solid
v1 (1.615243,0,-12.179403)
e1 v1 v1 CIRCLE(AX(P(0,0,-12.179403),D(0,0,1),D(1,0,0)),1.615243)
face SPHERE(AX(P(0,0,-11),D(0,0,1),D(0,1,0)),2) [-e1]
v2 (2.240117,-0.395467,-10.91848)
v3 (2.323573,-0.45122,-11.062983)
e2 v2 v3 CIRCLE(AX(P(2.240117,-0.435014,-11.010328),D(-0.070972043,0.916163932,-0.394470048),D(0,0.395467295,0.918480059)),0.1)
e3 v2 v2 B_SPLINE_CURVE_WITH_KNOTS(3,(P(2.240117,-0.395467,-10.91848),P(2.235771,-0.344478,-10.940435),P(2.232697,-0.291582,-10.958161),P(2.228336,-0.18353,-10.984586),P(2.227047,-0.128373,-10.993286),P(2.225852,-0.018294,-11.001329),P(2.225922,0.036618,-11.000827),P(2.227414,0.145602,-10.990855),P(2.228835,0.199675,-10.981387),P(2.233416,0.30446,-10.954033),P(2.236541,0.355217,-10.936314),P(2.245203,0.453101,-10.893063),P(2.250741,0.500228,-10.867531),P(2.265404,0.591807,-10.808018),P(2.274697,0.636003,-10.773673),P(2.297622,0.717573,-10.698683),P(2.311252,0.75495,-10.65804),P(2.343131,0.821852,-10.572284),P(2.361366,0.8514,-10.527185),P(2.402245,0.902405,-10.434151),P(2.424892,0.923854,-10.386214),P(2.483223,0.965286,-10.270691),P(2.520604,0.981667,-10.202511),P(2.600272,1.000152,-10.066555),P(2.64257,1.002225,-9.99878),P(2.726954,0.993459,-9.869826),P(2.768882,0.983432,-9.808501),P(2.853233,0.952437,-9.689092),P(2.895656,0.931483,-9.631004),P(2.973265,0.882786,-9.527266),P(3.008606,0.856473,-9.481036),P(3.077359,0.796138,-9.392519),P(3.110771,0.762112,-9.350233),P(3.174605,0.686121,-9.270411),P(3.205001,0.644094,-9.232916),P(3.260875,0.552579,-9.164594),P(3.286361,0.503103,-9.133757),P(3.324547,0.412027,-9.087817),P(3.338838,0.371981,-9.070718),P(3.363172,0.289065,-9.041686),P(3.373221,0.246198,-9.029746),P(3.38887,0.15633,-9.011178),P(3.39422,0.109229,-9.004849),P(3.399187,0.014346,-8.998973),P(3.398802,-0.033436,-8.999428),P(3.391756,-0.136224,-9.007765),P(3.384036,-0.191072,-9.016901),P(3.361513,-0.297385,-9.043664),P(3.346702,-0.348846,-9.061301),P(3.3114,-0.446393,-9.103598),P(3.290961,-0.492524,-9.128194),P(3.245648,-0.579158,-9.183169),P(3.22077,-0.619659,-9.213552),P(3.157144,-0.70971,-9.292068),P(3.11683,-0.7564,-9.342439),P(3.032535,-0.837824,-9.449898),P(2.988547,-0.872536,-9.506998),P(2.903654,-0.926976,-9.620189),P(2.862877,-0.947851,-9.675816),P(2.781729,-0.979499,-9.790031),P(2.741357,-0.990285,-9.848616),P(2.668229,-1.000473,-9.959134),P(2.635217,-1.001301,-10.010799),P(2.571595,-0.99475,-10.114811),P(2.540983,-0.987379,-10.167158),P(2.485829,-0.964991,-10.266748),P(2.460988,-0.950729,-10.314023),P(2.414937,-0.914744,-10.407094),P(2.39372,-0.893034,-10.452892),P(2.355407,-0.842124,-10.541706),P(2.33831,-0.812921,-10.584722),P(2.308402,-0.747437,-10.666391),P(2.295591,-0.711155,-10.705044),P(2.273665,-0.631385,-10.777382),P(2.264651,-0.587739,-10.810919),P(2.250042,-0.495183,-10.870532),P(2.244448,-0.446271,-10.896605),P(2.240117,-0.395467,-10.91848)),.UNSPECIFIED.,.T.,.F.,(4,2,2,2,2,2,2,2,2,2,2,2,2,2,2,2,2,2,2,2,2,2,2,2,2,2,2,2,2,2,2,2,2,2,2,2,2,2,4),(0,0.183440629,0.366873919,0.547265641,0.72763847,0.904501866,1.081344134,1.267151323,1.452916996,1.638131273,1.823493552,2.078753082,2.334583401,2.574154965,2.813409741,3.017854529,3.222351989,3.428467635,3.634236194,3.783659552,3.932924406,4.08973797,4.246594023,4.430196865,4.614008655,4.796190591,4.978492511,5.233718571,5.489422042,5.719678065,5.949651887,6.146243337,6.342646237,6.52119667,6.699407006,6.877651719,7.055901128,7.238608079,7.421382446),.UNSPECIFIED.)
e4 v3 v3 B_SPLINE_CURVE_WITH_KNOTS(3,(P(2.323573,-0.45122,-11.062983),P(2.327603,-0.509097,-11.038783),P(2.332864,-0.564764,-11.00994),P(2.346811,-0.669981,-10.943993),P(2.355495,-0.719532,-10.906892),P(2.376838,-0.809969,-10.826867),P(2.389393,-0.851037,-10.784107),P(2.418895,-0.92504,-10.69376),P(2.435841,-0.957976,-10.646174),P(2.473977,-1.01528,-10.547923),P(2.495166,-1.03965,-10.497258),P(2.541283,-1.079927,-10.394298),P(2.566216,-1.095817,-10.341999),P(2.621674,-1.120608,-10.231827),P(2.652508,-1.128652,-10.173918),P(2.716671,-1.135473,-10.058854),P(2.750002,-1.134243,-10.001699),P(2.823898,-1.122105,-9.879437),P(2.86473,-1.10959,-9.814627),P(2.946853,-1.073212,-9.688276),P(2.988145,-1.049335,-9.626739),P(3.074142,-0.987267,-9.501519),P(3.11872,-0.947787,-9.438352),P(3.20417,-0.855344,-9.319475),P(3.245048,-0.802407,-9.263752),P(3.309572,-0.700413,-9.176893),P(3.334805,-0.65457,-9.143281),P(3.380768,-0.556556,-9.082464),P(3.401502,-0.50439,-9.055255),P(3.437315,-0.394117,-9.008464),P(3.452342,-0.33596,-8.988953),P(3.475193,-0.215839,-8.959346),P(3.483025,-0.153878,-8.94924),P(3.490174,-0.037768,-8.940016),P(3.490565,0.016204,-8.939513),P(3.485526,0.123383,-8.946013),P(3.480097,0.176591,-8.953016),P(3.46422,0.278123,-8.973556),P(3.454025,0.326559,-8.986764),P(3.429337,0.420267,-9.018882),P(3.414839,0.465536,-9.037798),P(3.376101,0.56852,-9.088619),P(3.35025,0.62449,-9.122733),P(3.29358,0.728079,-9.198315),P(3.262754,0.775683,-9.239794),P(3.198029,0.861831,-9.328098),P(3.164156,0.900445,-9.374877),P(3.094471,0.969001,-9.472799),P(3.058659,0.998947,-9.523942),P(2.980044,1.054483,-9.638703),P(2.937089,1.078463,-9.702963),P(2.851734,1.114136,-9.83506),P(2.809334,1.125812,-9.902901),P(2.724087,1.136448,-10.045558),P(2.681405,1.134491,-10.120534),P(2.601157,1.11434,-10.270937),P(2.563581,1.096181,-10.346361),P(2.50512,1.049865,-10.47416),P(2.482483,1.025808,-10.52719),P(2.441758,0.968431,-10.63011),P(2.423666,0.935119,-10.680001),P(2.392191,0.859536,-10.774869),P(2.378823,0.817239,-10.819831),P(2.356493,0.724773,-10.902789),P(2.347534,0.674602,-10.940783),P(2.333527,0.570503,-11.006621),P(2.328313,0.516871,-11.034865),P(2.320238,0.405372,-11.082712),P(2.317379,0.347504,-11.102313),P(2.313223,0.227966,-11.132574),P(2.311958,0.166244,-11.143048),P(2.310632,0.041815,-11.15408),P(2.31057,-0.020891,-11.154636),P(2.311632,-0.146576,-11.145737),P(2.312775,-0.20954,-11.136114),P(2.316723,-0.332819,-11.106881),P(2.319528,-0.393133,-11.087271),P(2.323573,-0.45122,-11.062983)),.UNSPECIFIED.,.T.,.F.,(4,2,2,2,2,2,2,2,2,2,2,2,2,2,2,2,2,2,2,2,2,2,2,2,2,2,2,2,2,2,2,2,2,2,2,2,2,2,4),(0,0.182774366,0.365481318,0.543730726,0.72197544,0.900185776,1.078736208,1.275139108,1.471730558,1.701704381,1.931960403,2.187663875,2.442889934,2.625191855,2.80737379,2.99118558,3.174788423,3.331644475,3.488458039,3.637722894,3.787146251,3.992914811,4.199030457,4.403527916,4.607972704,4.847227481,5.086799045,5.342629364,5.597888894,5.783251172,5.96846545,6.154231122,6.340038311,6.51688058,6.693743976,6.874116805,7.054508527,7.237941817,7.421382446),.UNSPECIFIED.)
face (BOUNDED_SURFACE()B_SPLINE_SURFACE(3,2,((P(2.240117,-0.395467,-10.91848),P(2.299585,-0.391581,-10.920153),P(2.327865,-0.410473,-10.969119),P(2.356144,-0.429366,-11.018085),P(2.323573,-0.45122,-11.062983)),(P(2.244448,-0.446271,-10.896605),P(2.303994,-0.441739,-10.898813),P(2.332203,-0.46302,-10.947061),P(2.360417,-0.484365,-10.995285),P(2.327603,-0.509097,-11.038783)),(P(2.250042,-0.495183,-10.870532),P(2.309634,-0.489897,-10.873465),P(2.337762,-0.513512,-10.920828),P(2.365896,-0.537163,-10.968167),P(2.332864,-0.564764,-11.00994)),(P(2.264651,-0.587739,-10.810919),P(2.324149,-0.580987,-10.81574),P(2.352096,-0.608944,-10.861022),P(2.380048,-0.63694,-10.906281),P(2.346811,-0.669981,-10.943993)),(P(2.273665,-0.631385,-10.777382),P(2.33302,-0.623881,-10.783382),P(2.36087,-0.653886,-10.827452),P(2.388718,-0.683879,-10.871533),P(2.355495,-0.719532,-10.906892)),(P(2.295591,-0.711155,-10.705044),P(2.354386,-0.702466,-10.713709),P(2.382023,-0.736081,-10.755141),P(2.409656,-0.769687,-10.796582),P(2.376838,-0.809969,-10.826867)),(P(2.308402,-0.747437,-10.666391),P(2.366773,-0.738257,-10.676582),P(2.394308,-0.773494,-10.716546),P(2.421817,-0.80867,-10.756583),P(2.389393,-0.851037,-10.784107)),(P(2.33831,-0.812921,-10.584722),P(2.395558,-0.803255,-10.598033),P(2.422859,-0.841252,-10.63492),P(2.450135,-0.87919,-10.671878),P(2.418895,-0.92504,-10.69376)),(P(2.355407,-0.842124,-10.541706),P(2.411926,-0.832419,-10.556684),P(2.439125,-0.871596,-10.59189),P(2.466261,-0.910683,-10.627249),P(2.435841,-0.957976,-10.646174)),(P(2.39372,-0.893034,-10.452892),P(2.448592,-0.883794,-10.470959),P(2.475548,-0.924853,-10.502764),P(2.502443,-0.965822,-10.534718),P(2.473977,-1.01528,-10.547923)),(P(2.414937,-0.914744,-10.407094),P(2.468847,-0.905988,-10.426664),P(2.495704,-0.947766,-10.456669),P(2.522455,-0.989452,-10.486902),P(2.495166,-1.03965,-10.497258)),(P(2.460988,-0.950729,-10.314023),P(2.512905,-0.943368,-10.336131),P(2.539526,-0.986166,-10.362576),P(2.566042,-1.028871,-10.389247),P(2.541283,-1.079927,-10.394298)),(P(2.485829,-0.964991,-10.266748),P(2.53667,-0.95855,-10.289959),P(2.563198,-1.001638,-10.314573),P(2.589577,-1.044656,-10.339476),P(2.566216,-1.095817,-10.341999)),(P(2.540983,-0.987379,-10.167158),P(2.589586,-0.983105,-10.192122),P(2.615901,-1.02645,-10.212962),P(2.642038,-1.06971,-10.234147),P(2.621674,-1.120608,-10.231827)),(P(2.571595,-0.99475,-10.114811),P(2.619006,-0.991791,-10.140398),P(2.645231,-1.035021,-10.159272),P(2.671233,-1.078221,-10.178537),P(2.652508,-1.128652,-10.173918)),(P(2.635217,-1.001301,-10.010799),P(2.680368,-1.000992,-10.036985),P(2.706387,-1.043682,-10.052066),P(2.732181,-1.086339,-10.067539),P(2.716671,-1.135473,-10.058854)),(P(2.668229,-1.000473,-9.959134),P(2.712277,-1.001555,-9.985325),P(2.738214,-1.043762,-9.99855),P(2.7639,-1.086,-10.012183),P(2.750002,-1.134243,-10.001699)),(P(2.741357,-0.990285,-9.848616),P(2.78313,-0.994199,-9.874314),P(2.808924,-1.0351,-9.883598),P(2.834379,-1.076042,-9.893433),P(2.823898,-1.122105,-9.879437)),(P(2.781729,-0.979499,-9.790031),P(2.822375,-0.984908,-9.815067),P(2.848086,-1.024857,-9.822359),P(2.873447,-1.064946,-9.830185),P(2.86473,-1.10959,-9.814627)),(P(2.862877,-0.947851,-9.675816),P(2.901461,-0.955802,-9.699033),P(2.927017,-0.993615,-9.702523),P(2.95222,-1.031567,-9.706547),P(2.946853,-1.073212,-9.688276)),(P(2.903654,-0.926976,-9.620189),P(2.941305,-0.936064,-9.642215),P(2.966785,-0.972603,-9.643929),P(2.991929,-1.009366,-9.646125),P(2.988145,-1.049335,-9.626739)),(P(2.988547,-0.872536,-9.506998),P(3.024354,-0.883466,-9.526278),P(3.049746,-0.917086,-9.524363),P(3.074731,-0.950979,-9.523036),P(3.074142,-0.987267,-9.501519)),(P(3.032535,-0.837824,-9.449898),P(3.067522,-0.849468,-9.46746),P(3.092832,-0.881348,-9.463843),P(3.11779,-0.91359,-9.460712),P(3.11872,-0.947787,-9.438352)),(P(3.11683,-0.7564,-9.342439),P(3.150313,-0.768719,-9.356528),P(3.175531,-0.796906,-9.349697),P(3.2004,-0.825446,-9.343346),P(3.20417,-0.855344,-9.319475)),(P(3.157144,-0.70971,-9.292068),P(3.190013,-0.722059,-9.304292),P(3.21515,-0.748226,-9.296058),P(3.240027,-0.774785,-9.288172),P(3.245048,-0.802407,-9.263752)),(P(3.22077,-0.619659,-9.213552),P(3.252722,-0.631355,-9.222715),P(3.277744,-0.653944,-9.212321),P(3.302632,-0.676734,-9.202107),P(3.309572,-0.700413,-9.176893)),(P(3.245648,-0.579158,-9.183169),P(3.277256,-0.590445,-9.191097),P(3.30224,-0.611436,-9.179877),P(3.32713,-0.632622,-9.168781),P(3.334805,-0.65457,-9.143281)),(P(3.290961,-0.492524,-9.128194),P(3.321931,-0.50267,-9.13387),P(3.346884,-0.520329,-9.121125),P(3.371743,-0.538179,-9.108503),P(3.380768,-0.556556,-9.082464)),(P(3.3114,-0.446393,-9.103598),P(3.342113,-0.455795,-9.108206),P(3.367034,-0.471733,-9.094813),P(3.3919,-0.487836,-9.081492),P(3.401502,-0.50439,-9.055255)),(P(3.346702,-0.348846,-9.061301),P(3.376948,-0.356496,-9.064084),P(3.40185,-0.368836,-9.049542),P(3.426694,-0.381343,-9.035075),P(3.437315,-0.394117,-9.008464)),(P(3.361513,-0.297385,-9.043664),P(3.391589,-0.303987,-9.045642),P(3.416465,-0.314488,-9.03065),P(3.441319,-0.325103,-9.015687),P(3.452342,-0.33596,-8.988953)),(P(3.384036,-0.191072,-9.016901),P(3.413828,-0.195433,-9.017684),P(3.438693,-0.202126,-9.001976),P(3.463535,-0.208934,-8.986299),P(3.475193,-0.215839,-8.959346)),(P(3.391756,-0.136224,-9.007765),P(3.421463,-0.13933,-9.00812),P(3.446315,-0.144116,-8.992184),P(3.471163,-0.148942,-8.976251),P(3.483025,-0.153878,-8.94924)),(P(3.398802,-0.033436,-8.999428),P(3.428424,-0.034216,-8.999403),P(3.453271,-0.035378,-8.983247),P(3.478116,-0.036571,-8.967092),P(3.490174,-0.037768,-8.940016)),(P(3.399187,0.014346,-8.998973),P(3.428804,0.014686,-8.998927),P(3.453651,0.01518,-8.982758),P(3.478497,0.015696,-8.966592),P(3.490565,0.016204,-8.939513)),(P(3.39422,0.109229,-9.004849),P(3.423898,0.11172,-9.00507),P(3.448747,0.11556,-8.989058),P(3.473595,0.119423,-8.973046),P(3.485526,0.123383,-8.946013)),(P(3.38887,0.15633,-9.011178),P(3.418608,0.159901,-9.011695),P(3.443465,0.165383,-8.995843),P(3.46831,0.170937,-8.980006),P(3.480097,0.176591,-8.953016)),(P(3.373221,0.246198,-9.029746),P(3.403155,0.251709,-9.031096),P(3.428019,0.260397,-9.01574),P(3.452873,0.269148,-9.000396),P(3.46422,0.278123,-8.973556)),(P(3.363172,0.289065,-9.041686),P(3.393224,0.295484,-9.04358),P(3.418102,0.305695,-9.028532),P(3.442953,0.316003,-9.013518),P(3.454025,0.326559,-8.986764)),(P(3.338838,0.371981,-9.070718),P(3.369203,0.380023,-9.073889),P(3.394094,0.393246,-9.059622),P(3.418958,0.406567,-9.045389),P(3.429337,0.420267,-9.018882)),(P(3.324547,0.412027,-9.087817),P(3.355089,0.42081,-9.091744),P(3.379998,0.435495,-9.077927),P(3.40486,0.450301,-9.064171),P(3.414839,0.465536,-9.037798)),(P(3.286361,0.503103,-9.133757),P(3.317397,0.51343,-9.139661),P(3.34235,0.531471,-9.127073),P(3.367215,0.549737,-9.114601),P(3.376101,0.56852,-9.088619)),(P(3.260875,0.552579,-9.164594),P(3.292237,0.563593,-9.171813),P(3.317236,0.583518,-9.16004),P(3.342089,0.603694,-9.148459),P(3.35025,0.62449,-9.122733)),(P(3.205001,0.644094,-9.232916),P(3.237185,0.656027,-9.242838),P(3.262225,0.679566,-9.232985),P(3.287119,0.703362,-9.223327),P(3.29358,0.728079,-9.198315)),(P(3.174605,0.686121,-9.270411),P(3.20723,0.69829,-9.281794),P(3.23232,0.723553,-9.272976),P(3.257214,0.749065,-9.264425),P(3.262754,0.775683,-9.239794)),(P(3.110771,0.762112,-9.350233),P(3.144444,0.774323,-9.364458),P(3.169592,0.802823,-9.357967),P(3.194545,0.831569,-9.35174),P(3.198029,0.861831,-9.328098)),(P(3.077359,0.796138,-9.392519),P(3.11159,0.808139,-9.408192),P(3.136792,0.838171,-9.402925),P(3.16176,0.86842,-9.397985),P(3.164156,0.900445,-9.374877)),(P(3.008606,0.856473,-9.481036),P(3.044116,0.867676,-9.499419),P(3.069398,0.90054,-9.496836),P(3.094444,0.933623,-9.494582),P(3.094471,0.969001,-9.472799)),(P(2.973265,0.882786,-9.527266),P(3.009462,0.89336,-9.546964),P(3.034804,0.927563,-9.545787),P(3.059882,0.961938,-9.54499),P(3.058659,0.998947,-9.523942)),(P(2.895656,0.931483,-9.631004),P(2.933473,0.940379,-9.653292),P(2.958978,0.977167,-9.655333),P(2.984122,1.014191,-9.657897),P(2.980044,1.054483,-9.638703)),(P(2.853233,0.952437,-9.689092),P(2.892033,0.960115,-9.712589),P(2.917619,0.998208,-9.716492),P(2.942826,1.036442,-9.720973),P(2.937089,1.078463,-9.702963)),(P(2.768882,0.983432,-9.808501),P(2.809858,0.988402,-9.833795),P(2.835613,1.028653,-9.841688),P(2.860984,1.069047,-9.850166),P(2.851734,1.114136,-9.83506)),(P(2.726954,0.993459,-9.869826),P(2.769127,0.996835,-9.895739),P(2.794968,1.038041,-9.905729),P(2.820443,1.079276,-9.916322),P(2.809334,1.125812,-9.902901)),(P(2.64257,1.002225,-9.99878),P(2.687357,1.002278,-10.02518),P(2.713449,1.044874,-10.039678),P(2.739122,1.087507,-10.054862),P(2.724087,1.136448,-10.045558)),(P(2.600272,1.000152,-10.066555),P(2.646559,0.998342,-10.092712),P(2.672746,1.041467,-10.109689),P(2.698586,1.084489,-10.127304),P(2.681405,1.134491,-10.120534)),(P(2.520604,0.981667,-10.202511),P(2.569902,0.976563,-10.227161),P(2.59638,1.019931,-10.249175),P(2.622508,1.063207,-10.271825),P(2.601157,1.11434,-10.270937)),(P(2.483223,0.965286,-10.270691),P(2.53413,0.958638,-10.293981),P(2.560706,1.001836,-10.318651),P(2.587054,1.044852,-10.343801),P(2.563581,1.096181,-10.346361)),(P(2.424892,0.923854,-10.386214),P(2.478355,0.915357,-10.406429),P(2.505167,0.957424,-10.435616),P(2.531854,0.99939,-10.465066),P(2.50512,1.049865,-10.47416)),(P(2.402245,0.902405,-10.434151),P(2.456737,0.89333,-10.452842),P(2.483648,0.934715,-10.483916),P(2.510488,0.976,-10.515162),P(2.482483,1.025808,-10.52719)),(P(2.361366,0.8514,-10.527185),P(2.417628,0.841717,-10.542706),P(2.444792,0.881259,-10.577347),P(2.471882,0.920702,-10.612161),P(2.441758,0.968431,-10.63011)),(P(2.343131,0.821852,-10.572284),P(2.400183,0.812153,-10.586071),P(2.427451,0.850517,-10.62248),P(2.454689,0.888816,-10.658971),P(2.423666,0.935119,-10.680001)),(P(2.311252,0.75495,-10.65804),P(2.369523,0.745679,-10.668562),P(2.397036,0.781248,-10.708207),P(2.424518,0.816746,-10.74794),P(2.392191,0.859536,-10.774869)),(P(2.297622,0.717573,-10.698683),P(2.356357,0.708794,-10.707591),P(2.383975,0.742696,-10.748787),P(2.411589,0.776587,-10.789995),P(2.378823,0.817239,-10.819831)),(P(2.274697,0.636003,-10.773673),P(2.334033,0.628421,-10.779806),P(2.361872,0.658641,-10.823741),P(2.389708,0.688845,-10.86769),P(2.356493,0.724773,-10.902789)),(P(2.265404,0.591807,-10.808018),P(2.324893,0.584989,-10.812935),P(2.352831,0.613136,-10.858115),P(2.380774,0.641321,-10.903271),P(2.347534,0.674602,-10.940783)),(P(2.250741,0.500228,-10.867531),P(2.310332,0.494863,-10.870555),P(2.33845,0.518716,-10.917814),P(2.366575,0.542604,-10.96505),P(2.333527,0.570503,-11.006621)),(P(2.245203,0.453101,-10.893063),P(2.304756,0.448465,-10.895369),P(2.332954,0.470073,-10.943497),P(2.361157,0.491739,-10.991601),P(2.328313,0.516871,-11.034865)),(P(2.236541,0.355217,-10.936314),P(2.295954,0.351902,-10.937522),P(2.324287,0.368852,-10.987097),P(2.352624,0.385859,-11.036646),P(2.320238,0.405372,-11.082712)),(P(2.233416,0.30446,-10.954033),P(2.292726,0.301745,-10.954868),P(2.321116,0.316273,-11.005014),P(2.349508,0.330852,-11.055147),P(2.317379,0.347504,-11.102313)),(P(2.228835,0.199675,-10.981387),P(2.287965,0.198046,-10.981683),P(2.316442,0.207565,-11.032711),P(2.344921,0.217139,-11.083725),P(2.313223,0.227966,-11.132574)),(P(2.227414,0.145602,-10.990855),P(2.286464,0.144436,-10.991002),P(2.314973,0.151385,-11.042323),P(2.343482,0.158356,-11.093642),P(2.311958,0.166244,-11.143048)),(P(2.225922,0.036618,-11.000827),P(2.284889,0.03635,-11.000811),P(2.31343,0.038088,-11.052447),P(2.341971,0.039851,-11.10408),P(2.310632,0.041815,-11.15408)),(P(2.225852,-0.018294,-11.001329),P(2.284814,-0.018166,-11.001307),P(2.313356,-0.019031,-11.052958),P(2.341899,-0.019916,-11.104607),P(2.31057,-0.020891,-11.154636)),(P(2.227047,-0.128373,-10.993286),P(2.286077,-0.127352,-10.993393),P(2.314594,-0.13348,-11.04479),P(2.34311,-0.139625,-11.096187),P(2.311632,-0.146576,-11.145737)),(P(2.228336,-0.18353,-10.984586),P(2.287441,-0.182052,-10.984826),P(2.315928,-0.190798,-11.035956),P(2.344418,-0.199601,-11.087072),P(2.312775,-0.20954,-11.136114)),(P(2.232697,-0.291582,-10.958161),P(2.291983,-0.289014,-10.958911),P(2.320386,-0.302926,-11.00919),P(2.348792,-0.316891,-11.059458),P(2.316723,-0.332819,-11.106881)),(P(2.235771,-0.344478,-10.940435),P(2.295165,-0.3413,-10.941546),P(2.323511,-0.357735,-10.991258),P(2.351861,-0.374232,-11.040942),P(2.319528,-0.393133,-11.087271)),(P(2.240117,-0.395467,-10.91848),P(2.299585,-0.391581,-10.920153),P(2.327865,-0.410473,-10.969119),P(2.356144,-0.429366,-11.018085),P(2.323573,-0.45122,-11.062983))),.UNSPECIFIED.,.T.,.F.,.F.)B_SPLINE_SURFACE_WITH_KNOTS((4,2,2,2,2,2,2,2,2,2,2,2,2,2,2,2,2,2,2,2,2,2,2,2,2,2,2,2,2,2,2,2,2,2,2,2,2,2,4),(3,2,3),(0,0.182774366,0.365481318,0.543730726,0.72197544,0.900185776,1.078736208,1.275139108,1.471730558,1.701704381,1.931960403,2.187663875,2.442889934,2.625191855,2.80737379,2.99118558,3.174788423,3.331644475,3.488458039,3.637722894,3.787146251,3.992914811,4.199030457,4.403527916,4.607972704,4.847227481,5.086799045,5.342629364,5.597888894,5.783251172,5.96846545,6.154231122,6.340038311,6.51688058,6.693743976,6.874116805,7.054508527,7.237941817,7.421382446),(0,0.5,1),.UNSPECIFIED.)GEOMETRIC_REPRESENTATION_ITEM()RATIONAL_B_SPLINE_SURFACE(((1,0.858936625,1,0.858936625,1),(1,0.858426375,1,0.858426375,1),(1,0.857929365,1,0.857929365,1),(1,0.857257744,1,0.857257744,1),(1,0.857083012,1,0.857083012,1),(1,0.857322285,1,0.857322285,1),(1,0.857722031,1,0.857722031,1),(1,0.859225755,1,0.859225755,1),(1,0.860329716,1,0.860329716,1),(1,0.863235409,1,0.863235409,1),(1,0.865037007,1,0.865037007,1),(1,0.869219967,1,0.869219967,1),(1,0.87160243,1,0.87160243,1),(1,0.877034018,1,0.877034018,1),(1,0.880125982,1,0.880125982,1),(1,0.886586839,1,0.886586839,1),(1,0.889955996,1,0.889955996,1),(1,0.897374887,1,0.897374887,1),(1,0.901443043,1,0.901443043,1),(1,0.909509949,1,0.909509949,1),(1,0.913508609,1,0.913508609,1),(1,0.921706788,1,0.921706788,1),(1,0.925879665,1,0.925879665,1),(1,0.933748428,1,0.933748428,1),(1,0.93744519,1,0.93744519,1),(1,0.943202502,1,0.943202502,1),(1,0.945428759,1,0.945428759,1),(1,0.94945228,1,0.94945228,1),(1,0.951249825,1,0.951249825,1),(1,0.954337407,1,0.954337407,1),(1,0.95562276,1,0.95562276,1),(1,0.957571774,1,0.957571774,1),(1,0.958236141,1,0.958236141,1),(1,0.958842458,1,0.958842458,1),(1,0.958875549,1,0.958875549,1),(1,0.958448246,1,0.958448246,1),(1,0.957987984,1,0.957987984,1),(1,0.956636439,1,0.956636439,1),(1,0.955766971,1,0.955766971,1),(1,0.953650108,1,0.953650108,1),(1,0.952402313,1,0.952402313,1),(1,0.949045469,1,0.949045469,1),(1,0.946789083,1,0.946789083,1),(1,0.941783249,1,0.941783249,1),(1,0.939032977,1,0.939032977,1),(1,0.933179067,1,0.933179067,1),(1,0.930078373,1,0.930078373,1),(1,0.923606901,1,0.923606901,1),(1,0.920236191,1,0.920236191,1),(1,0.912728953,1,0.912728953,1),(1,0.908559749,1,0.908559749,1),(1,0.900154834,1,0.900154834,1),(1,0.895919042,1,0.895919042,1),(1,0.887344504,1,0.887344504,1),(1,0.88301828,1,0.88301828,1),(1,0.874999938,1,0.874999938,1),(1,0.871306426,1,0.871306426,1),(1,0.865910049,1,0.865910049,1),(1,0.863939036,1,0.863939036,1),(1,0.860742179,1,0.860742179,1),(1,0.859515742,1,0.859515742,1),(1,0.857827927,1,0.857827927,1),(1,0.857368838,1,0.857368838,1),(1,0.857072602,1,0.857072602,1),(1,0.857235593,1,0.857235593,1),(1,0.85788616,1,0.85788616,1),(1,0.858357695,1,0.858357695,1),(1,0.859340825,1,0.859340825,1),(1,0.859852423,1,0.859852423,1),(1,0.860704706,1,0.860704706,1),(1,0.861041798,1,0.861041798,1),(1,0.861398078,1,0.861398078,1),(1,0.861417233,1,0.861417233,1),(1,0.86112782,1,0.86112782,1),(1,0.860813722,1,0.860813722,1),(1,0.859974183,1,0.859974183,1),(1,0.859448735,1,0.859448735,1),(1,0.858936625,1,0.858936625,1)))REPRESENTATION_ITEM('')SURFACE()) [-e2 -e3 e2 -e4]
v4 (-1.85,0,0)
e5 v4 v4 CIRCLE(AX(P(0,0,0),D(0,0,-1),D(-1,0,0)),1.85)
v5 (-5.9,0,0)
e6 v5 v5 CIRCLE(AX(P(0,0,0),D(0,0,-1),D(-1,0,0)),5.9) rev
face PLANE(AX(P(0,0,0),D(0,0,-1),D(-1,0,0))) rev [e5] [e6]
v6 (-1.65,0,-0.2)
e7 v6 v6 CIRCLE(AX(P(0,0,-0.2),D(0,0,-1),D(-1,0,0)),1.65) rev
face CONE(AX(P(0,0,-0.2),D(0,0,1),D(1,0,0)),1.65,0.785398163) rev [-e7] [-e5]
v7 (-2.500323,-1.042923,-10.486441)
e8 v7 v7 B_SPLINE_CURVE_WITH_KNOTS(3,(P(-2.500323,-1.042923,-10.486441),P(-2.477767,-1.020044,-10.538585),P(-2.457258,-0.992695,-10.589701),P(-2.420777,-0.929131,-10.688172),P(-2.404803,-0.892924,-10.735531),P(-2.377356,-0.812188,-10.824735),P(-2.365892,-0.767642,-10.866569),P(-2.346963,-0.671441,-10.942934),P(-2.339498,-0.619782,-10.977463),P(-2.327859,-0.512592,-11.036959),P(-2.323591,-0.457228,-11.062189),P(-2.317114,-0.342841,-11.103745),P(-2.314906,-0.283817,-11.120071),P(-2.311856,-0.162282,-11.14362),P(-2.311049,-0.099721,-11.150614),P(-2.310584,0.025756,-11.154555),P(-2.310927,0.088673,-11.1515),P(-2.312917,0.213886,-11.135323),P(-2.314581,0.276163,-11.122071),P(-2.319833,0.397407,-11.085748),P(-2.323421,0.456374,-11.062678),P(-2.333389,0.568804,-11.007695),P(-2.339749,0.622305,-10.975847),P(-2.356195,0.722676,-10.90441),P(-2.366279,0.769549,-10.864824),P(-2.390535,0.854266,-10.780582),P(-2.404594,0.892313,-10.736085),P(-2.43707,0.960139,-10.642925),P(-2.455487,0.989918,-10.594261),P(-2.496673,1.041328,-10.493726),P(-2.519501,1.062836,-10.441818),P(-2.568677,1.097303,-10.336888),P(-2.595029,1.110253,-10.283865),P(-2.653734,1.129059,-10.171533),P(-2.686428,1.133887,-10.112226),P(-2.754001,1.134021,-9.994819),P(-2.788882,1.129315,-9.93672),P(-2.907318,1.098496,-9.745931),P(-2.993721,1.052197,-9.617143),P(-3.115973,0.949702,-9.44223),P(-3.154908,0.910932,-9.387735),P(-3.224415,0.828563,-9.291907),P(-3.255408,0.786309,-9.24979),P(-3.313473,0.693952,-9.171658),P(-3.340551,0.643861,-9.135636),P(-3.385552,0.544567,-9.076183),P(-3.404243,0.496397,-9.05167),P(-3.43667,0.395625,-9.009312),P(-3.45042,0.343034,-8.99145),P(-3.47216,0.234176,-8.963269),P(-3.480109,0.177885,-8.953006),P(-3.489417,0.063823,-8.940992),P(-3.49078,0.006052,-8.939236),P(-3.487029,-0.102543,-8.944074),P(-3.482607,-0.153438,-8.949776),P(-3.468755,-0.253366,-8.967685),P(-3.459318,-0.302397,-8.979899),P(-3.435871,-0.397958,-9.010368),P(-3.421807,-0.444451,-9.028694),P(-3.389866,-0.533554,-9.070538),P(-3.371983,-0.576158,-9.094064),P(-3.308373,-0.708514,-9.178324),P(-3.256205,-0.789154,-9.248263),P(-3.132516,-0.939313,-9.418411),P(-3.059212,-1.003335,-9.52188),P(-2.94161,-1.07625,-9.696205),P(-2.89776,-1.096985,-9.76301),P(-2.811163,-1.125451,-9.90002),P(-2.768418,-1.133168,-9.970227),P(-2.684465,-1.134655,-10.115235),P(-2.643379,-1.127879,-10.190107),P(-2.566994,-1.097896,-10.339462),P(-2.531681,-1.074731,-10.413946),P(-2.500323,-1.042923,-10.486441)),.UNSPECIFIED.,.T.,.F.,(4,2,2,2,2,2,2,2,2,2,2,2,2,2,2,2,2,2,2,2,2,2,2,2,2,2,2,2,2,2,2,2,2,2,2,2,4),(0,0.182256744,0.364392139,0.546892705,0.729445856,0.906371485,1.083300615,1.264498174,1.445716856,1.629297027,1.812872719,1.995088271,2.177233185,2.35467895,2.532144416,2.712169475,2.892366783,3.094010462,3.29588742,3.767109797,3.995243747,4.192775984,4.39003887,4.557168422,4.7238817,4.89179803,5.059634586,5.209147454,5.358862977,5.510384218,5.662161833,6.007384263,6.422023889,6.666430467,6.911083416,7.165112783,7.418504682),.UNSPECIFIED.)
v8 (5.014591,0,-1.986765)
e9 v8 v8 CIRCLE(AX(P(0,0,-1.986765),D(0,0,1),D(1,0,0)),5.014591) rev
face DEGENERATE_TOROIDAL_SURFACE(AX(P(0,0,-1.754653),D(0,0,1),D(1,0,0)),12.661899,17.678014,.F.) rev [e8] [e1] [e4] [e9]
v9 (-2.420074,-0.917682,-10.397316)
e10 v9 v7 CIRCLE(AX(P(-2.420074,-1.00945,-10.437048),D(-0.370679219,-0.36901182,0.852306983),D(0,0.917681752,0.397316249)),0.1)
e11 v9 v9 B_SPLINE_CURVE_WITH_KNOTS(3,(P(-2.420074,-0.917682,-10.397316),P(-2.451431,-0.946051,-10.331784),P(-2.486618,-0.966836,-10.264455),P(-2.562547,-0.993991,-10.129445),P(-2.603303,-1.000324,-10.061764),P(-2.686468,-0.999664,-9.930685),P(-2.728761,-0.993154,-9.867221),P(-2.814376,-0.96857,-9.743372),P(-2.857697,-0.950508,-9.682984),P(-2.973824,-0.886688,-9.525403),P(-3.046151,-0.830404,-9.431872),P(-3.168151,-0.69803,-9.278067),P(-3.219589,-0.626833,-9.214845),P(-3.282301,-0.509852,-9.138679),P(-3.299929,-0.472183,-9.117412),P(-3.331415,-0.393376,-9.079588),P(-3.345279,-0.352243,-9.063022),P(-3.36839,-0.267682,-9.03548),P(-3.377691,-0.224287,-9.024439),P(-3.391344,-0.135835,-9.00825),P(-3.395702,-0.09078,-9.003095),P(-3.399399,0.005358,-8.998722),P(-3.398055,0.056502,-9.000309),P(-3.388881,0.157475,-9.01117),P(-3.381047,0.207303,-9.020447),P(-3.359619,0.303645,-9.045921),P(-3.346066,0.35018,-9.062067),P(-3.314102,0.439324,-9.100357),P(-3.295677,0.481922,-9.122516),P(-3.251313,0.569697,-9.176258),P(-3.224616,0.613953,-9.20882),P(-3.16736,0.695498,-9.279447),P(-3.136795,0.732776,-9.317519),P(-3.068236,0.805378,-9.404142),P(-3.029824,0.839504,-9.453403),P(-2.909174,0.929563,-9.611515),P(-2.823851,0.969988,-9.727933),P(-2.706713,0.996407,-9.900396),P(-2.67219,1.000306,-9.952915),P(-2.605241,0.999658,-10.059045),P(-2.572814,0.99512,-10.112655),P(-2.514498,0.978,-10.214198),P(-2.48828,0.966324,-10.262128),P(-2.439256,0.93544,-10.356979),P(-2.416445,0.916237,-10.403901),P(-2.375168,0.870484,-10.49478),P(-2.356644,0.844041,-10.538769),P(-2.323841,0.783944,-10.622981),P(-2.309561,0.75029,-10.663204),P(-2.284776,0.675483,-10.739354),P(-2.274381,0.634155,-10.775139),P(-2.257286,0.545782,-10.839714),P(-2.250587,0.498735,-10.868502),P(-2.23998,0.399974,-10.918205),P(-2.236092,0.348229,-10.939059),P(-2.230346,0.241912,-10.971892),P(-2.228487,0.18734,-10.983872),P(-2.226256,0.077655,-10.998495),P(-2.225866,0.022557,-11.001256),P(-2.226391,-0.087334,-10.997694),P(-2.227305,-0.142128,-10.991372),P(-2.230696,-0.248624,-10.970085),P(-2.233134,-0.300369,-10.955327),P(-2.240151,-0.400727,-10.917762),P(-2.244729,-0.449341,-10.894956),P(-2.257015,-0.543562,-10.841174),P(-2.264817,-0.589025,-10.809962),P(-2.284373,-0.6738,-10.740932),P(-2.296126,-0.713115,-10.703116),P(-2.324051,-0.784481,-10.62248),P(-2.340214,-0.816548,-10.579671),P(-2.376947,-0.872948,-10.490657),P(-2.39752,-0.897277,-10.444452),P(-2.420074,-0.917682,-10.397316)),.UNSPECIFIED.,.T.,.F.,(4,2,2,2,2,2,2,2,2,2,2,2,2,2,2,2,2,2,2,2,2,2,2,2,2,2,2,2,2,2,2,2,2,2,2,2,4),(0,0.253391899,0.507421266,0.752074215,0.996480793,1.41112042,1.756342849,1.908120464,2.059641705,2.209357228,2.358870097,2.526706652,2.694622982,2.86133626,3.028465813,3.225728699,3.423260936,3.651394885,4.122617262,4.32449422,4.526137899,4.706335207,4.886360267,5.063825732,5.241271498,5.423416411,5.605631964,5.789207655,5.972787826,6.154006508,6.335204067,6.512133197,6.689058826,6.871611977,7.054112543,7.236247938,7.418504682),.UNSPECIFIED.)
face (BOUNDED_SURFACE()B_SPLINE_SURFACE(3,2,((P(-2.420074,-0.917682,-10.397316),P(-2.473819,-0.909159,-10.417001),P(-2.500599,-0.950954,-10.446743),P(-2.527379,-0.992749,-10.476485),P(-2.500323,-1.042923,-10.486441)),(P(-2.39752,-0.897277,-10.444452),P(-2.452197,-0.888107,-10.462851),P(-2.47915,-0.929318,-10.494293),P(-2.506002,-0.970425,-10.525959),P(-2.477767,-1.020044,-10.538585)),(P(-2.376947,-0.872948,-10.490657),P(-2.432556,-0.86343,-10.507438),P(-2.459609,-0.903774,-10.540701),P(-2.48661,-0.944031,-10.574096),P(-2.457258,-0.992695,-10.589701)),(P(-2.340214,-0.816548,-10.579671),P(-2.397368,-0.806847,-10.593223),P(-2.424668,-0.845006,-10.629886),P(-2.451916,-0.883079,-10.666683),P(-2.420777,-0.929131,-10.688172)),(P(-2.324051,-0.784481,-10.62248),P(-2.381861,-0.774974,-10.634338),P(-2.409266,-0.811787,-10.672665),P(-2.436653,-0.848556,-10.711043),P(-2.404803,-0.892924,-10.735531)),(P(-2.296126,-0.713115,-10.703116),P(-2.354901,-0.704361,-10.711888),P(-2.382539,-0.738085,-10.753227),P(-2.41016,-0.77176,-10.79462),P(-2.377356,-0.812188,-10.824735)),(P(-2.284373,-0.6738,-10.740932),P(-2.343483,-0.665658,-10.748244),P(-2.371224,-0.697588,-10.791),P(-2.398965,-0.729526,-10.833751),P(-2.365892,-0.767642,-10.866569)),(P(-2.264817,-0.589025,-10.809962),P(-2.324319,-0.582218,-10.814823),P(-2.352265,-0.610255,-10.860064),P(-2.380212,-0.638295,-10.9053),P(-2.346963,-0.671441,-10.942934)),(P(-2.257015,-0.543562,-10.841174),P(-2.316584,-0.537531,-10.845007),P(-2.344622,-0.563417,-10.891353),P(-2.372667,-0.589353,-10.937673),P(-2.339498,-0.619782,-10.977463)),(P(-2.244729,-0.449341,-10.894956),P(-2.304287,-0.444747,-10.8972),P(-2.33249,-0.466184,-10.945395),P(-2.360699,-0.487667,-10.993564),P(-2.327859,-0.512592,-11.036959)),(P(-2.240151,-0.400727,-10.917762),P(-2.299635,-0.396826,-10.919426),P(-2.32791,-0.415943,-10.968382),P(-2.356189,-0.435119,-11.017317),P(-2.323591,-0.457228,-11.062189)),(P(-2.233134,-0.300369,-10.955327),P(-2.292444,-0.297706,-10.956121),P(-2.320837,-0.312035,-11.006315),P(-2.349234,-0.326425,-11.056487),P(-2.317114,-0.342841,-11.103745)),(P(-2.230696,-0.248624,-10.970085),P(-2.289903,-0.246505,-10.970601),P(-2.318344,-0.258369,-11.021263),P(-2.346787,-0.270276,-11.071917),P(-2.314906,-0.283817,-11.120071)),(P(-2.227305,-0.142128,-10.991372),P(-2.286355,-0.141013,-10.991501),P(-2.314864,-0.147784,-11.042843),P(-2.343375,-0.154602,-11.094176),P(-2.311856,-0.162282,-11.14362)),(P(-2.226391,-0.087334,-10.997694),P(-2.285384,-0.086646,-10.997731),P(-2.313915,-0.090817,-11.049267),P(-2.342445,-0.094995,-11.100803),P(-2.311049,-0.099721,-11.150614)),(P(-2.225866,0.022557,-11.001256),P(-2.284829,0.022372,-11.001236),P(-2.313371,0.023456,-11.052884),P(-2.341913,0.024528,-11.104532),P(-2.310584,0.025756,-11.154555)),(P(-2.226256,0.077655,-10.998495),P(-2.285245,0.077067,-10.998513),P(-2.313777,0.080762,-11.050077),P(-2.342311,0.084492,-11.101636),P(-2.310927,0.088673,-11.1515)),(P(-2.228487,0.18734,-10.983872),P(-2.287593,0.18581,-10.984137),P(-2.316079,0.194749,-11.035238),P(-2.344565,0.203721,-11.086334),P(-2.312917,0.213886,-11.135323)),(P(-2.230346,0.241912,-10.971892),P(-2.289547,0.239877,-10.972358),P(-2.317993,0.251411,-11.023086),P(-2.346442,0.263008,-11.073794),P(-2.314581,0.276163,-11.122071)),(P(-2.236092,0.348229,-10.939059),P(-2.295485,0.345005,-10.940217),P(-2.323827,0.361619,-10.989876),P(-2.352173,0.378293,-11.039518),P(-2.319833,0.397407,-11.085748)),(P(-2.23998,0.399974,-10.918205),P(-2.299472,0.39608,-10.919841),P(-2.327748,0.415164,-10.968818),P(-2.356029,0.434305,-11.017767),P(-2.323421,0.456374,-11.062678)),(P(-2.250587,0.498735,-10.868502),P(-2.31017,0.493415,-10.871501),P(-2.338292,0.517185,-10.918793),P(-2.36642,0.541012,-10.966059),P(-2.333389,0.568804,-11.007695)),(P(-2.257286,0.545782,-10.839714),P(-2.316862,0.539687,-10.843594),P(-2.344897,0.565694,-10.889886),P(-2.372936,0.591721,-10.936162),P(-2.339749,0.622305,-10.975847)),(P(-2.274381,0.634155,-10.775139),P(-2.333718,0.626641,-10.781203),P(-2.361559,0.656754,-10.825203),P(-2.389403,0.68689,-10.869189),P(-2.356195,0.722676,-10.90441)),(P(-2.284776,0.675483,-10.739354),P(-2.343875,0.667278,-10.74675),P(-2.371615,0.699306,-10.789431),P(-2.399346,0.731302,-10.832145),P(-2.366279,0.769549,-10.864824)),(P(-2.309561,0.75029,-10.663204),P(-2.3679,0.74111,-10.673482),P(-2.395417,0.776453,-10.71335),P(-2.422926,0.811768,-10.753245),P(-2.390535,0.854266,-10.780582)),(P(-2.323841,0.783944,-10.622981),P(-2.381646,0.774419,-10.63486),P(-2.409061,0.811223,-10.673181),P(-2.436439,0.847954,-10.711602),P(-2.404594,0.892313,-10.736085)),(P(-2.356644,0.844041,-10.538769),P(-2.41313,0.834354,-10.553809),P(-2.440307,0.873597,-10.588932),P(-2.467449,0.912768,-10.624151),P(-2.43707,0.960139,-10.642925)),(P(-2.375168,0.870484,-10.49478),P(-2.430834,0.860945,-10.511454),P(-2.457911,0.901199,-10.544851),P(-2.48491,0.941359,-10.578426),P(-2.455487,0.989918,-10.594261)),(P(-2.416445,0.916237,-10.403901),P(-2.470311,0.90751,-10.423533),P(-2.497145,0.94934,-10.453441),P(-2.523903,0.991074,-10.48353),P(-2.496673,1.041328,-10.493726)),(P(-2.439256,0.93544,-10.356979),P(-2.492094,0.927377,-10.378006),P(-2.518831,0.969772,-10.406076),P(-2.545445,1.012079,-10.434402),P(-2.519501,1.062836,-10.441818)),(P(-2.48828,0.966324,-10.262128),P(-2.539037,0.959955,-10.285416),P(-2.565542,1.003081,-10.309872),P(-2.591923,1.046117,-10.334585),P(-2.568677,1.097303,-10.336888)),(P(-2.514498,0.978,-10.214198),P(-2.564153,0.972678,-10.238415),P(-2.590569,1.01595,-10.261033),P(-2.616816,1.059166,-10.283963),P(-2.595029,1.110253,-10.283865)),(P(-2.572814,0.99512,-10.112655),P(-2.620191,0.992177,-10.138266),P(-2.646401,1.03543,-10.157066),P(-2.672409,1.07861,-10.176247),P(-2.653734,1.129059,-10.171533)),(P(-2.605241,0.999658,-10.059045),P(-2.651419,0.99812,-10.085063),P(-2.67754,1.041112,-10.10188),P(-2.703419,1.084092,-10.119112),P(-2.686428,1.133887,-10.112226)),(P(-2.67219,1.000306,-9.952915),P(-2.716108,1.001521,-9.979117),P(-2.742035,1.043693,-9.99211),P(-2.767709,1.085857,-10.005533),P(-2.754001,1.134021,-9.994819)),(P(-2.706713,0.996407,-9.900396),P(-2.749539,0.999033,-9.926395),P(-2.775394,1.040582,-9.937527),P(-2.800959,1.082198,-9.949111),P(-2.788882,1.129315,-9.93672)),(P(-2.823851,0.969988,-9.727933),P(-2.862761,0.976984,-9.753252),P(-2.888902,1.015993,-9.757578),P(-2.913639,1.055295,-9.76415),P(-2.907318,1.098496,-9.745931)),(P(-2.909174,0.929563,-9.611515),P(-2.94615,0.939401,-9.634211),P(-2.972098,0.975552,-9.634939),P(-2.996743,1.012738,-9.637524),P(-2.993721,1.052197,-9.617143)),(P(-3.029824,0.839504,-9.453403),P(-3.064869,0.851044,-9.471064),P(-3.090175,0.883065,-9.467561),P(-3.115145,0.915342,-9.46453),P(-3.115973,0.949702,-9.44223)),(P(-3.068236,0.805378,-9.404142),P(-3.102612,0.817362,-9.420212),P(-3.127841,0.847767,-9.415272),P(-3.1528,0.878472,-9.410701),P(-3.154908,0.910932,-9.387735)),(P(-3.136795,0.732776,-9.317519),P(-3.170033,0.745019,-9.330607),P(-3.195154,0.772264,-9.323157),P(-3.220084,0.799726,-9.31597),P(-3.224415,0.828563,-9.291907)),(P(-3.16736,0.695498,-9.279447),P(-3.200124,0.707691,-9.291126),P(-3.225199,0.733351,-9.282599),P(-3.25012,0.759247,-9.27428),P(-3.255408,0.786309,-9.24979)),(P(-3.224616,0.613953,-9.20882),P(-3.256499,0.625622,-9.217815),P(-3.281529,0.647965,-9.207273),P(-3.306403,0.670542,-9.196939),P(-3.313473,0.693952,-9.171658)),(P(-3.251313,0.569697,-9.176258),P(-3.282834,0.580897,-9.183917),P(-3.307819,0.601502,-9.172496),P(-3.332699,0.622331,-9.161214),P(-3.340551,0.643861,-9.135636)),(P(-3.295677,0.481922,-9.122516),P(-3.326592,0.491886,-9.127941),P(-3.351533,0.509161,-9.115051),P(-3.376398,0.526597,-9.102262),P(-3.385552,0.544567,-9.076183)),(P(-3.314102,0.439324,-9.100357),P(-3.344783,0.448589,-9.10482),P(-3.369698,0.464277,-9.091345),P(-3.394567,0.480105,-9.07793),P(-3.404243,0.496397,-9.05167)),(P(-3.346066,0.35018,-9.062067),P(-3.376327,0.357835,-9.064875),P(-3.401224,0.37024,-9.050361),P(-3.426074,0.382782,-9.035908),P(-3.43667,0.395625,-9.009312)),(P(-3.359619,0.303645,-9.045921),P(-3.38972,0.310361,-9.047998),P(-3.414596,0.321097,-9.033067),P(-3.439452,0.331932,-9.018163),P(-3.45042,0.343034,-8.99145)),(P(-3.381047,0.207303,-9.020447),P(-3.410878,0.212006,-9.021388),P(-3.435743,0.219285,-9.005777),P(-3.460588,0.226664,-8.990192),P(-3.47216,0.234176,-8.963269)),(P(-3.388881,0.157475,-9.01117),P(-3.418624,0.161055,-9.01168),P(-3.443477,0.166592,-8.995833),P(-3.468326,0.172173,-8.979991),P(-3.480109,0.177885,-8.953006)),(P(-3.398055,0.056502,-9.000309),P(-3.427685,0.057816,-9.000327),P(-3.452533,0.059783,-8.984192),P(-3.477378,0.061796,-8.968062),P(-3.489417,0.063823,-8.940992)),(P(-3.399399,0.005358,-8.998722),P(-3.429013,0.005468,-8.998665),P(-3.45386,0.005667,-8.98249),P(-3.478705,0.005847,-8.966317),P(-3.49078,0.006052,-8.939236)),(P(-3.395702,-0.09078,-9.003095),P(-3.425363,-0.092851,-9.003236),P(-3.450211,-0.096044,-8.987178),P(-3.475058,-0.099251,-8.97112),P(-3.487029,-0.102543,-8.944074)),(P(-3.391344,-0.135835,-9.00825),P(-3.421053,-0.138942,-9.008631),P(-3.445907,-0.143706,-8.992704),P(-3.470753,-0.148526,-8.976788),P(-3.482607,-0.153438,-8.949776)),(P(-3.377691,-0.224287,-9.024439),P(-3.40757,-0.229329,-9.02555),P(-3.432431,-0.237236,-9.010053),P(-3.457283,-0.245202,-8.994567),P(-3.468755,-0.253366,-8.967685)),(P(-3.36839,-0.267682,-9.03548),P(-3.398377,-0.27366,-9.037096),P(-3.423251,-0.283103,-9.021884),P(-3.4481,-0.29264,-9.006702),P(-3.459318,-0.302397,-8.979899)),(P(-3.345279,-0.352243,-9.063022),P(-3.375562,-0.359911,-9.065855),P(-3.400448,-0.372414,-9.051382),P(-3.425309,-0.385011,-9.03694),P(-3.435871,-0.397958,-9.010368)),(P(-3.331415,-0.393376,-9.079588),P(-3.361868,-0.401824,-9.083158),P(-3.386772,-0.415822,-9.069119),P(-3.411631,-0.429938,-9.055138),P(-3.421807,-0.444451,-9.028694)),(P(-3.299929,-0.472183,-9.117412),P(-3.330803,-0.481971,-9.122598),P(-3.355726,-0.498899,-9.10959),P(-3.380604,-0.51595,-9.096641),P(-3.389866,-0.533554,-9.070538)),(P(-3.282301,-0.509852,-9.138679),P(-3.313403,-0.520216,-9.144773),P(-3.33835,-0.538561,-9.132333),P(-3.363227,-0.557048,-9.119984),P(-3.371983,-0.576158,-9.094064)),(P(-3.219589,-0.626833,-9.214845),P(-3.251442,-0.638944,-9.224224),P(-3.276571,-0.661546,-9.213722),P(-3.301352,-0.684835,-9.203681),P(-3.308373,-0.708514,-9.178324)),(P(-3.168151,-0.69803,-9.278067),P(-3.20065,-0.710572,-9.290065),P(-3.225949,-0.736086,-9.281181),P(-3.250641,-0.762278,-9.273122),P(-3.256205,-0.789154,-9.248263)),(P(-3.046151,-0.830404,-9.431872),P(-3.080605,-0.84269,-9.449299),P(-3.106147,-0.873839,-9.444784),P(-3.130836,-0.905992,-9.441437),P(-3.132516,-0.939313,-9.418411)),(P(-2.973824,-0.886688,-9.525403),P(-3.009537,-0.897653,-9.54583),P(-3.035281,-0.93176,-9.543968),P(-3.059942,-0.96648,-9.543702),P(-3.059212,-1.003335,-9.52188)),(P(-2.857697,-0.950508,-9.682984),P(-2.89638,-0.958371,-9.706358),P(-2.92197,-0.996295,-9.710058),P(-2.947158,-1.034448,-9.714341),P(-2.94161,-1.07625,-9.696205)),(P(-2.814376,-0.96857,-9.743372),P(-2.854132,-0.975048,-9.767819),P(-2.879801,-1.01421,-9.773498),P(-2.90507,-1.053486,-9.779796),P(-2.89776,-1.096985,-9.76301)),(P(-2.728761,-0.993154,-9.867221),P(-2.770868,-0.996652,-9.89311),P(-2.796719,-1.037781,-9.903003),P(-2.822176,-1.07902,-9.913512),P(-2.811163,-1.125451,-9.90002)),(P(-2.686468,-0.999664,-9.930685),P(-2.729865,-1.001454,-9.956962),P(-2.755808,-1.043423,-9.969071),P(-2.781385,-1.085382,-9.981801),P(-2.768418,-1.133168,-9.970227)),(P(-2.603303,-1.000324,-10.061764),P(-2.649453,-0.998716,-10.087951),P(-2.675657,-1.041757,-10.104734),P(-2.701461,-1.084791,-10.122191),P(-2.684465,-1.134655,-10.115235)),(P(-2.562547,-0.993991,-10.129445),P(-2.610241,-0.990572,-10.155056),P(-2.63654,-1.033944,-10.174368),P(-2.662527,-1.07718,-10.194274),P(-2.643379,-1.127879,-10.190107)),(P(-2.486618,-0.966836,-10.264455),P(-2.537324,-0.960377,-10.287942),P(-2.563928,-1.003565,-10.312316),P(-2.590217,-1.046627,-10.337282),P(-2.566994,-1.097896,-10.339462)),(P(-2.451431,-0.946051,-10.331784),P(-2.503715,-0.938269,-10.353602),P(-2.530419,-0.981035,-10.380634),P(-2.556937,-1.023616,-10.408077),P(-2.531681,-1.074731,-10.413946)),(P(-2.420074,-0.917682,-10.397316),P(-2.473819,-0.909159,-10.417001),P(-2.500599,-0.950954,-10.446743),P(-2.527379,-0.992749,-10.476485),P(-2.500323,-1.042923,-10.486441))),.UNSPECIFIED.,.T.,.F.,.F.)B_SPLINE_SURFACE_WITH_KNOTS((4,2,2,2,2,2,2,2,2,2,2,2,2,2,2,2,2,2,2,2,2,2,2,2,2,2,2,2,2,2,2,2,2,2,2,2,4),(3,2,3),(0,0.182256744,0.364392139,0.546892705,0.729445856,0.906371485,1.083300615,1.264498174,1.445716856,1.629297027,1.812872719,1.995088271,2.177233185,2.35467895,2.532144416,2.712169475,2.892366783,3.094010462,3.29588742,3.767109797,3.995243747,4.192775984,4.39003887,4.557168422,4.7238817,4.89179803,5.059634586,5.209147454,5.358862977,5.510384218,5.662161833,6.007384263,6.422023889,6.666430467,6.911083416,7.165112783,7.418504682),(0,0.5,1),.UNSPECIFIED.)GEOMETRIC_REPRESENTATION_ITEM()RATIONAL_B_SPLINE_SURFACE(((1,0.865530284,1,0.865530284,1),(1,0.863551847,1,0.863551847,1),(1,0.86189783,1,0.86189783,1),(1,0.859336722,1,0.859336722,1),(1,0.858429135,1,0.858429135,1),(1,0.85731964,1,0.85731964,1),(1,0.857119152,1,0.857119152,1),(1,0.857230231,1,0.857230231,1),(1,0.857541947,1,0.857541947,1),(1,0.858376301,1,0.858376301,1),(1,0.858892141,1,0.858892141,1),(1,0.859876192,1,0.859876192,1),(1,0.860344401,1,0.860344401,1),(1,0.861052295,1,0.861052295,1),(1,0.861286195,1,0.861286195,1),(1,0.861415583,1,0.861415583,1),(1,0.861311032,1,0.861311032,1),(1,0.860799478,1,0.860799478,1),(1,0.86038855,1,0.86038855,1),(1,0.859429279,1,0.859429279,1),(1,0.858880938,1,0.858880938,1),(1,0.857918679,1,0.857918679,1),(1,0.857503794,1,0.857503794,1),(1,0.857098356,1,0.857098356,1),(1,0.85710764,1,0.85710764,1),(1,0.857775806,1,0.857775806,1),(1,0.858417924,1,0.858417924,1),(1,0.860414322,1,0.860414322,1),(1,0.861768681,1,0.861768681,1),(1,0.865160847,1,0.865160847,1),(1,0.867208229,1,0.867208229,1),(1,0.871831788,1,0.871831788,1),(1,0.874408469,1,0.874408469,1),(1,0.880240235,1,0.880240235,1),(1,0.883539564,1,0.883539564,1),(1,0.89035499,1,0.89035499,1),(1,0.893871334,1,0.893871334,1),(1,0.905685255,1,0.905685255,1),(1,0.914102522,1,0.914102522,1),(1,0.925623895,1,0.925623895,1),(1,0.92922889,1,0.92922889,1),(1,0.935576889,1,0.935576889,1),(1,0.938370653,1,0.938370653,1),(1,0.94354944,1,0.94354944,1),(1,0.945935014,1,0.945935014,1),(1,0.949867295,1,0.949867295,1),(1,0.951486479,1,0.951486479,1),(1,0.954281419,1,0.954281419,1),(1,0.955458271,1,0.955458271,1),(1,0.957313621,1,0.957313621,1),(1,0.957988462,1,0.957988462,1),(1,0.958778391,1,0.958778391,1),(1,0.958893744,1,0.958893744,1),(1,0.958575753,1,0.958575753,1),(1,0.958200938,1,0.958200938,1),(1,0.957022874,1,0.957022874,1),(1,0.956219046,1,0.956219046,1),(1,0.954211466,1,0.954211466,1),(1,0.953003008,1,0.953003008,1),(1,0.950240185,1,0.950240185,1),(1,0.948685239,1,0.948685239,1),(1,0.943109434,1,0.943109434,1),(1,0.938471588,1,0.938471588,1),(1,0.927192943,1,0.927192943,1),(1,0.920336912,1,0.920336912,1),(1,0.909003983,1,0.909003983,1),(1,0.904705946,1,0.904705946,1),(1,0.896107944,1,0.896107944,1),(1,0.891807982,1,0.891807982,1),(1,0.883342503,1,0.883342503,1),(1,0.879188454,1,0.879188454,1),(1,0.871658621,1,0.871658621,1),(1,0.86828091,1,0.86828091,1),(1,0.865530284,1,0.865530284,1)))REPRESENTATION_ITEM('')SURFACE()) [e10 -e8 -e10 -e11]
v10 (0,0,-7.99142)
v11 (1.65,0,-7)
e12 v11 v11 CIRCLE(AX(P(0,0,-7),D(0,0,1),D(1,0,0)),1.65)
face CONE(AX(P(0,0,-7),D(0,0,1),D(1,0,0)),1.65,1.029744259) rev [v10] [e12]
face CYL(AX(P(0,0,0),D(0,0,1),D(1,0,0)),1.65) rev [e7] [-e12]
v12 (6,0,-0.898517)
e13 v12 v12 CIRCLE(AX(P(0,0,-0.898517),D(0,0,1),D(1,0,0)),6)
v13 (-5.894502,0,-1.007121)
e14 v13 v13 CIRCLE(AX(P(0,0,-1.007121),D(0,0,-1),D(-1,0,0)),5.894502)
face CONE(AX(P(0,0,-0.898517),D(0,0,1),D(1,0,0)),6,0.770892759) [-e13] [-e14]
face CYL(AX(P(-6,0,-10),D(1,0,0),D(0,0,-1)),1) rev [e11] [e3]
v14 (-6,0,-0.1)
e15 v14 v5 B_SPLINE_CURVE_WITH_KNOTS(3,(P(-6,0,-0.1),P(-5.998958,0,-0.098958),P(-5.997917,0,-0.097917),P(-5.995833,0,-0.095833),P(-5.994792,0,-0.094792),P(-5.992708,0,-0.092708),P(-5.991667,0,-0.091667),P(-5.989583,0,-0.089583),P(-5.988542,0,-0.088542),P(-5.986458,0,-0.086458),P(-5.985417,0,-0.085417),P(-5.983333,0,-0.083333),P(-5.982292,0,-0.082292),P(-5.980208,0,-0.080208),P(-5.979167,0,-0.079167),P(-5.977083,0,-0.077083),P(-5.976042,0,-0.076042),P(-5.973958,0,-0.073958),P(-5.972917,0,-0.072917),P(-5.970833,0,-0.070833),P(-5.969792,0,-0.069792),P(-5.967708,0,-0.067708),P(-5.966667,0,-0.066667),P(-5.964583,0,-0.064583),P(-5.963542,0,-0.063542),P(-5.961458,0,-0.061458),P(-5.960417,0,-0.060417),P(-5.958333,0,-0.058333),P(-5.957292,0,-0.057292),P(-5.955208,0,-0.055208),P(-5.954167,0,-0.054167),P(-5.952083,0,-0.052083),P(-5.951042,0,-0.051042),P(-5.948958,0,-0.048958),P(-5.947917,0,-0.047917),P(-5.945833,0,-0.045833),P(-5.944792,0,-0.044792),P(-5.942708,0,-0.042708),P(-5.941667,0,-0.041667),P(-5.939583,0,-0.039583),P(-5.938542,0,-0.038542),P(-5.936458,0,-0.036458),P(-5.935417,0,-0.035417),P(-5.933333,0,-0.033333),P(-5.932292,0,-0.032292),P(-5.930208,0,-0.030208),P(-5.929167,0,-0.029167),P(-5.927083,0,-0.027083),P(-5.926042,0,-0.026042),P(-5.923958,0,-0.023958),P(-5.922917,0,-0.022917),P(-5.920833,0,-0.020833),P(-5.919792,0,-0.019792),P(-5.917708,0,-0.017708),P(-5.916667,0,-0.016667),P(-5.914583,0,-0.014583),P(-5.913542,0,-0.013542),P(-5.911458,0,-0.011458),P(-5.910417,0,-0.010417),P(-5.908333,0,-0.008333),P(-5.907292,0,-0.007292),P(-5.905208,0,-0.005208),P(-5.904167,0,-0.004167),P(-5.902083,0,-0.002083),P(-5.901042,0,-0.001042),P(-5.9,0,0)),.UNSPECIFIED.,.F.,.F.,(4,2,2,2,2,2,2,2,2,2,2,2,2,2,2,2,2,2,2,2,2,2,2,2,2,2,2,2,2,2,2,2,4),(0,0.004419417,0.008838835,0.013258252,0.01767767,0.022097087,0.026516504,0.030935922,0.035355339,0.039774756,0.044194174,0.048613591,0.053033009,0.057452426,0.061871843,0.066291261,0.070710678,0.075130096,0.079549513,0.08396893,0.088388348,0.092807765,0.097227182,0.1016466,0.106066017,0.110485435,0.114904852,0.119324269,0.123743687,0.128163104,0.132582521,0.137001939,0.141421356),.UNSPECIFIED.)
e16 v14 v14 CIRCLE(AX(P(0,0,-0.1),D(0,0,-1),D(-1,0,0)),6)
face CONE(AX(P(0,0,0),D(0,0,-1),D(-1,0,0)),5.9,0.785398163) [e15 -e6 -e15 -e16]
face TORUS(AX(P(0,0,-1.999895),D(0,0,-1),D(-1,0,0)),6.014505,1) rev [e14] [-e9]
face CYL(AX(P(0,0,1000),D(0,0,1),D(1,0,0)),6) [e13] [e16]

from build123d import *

# Parameters (mm, degrees)
CONG_1_R                                      = 1
CHANFREIN1_SIZE                               = 0.101482527
CHANFREIN1_SIZE_2                             = 0.1
ENL_V_MAT_EXTRU_1_DEPTH                       = 16.524174696
ENL_V_MAT_EXTRU_1_DEPTH_BACK                  = 16.524174696
ESQUISSE2_R                                   = 1
CONG_2_R                                      = 0.1
TROU_POUR_TARAUDAGE_POUR_TROU_TARAUD_M4_D     = 3.3
TROU_POUR_TARAUDAGE_POUR_TROU_TARAUD_M4_DEPTH = 7
TROU_POUR_TARAUDAGE_POUR_TROU_TARAUD_M4_TIP   = 0.991420021
CHANFREIN2_SIZE                               = 0.2


with BuildPart() as part:
    # Esquisse1 → Révolution1 (revolve)
    with BuildSketch(Plane(origin=(0, 0, 0), x_dir=(0, 0, -1), z_dir=(1, 0, 0)), mode=Mode.PRIVATE) as r_volution1_sk:
        with BuildLine():
            Line((0, 0), (0, 6))
            Line((0, 6), (1, 6))
            Line((1, 6), (1, 5))
            ThreePointArc((1, 5), (6.877331854, 4.257626479), (12.179402793, 1.615242722))
            ThreePointArc((12.179402793, 1.615242722), (12.783087994, 0.905868206), (13, 0))
            Line((13, 0), (11, 0))
            Line((11, 0), (0, 0))
        make_face()
    revolve(r_volution1_sk.sketch.rotate(Axis((0, 0, 1000), (0, 0, -1)), 90), axis=Axis((0, 0, 1000), (0, 0, -1)))

    # Congé1
    # the kernel refuses this fillet: 1 mm, written as the material it adds along each edge
    with BuildSketch(Plane(origin=(0, 0, -1), x_dir=(1, 0, 0), z_dir=(0, 1, 0))) as cong_1_piece_1_section:
        with BuildLine():
            CenterArc((6.014503514, 1), CONG_1_R, 180.752635343, 89.247364657)
            ThreePointArc((5.01458979, 0.986864413), (5.014183378, 0.493330367), (5, 0))
            Line((5, 0), (6.014503514, 0))
        make_face()
    cong_1_piece_1 = revolve(axis=Axis((0, 0, -1), (0, 0, -1)), mode=Mode.PRIVATE)
    cong_1_piece_1 = cong_1_piece_1 & Plane(origin=(0, 0, -1), x_dir=(1, 0, 0), z_dir=(0, 0, -1)) * Cylinder(6, 25, mode=Mode.PRIVATE)
    add(cong_1_piece_1)

    # Chanfrein1
    # the kernel refuses this chamfer: 0.101482527, 0.1 mm, written as the material it takes off along each edge
    with BuildSketch(Plane(origin=(0, 0, -1.000105181), x_dir=(1, 0, 0), z_dir=(0, 1, 0))) as chanfrein1_piece_1:
        with BuildLine():
            Line((5.894501906, 0.007121121), (6, -CHANFREIN1_SIZE * 1.00000000364))
            Line((6, -CHANFREIN1_SIZE * 1.00000000364), (6, 0))
            ThreePointArc((6, 0), (5.94564706, 0.002268241), (5.894501906, 0.007121121))
        make_face()
    revolve(axis=Axis((0, 0, -1.000105181), (0, 0, -1)), mode=Mode.SUBTRACT)
    with BuildSketch(Plane(origin=(0, 0, 0), x_dir=(1, 0, 0), z_dir=(0, 1, 0))) as chanfrein1_piece_2:
        Polygon((6, CHANFREIN1_SIZE_2), (6 - CHANFREIN1_SIZE_2, 0), (6, 0), align=None)
    revolve(axis=Axis((0, 0, 0), (0, 0, -1)), mode=Mode.SUBTRACT)

    # Esquisse2 → Enlèv. mat.-Extru.1 (cut, two sides: drawn at the far end of the back side and taken through both)
    with BuildSketch(Plane(origin=(0, 0, 0), x_dir=(0, 0, -1), z_dir=(1, 0, 0)).offset(-ENL_V_MAT_EXTRU_1_DEPTH_BACK)):
        with Locations(Location((10, 0, 0), (0, 0, 359.999999734))):
            Circle(ESQUISSE2_R)
    extrude(amount=ENL_V_MAT_EXTRU_1_DEPTH + ENL_V_MAT_EXTRU_1_DEPTH_BACK, mode=Mode.SUBTRACT)

    # Congé2
    cong_2_edges = [part.edges().sort_by_distance(p)[0] for p in [
        (2.823077701, 0.999326778, -9.963311744),
        (-3.463147639, 4e-09, -8.999999997),
    ]]
    fillet(cong_2_edges, radius=CONG_2_R)

    # Trou pour taraudage pour trou taraudé M41
    with Locations(Plane.XY):
        with Locations((0, 0)):
            Hole(TROU_POUR_TARAUDAGE_POUR_TROU_TARAUD_M4_D / 2, depth=TROU_POUR_TARAUDAGE_POUR_TROU_TARAUD_M4_DEPTH)
            with Locations((0, 0, -(TROU_POUR_TARAUDAGE_POUR_TROU_TARAUD_M4_DEPTH + TROU_POUR_TARAUDAGE_POUR_TROU_TARAUD_M4_TIP / 2))):  # 118° drill point
                Cone(0, TROU_POUR_TARAUDAGE_POUR_TROU_TARAUD_M4_D / 2, TROU_POUR_TARAUDAGE_POUR_TROU_TARAUD_M4_TIP, mode=Mode.SUBTRACT)

    # Chanfrein2
    chanfrein2_edges = [part.edges().sort_by_distance(p)[0] for p in [
        (1.65, 0, 0),
    ]]
    chamfer(chanfrein2_edges, length=CHANFREIN2_SIZE)


solid = part.part
